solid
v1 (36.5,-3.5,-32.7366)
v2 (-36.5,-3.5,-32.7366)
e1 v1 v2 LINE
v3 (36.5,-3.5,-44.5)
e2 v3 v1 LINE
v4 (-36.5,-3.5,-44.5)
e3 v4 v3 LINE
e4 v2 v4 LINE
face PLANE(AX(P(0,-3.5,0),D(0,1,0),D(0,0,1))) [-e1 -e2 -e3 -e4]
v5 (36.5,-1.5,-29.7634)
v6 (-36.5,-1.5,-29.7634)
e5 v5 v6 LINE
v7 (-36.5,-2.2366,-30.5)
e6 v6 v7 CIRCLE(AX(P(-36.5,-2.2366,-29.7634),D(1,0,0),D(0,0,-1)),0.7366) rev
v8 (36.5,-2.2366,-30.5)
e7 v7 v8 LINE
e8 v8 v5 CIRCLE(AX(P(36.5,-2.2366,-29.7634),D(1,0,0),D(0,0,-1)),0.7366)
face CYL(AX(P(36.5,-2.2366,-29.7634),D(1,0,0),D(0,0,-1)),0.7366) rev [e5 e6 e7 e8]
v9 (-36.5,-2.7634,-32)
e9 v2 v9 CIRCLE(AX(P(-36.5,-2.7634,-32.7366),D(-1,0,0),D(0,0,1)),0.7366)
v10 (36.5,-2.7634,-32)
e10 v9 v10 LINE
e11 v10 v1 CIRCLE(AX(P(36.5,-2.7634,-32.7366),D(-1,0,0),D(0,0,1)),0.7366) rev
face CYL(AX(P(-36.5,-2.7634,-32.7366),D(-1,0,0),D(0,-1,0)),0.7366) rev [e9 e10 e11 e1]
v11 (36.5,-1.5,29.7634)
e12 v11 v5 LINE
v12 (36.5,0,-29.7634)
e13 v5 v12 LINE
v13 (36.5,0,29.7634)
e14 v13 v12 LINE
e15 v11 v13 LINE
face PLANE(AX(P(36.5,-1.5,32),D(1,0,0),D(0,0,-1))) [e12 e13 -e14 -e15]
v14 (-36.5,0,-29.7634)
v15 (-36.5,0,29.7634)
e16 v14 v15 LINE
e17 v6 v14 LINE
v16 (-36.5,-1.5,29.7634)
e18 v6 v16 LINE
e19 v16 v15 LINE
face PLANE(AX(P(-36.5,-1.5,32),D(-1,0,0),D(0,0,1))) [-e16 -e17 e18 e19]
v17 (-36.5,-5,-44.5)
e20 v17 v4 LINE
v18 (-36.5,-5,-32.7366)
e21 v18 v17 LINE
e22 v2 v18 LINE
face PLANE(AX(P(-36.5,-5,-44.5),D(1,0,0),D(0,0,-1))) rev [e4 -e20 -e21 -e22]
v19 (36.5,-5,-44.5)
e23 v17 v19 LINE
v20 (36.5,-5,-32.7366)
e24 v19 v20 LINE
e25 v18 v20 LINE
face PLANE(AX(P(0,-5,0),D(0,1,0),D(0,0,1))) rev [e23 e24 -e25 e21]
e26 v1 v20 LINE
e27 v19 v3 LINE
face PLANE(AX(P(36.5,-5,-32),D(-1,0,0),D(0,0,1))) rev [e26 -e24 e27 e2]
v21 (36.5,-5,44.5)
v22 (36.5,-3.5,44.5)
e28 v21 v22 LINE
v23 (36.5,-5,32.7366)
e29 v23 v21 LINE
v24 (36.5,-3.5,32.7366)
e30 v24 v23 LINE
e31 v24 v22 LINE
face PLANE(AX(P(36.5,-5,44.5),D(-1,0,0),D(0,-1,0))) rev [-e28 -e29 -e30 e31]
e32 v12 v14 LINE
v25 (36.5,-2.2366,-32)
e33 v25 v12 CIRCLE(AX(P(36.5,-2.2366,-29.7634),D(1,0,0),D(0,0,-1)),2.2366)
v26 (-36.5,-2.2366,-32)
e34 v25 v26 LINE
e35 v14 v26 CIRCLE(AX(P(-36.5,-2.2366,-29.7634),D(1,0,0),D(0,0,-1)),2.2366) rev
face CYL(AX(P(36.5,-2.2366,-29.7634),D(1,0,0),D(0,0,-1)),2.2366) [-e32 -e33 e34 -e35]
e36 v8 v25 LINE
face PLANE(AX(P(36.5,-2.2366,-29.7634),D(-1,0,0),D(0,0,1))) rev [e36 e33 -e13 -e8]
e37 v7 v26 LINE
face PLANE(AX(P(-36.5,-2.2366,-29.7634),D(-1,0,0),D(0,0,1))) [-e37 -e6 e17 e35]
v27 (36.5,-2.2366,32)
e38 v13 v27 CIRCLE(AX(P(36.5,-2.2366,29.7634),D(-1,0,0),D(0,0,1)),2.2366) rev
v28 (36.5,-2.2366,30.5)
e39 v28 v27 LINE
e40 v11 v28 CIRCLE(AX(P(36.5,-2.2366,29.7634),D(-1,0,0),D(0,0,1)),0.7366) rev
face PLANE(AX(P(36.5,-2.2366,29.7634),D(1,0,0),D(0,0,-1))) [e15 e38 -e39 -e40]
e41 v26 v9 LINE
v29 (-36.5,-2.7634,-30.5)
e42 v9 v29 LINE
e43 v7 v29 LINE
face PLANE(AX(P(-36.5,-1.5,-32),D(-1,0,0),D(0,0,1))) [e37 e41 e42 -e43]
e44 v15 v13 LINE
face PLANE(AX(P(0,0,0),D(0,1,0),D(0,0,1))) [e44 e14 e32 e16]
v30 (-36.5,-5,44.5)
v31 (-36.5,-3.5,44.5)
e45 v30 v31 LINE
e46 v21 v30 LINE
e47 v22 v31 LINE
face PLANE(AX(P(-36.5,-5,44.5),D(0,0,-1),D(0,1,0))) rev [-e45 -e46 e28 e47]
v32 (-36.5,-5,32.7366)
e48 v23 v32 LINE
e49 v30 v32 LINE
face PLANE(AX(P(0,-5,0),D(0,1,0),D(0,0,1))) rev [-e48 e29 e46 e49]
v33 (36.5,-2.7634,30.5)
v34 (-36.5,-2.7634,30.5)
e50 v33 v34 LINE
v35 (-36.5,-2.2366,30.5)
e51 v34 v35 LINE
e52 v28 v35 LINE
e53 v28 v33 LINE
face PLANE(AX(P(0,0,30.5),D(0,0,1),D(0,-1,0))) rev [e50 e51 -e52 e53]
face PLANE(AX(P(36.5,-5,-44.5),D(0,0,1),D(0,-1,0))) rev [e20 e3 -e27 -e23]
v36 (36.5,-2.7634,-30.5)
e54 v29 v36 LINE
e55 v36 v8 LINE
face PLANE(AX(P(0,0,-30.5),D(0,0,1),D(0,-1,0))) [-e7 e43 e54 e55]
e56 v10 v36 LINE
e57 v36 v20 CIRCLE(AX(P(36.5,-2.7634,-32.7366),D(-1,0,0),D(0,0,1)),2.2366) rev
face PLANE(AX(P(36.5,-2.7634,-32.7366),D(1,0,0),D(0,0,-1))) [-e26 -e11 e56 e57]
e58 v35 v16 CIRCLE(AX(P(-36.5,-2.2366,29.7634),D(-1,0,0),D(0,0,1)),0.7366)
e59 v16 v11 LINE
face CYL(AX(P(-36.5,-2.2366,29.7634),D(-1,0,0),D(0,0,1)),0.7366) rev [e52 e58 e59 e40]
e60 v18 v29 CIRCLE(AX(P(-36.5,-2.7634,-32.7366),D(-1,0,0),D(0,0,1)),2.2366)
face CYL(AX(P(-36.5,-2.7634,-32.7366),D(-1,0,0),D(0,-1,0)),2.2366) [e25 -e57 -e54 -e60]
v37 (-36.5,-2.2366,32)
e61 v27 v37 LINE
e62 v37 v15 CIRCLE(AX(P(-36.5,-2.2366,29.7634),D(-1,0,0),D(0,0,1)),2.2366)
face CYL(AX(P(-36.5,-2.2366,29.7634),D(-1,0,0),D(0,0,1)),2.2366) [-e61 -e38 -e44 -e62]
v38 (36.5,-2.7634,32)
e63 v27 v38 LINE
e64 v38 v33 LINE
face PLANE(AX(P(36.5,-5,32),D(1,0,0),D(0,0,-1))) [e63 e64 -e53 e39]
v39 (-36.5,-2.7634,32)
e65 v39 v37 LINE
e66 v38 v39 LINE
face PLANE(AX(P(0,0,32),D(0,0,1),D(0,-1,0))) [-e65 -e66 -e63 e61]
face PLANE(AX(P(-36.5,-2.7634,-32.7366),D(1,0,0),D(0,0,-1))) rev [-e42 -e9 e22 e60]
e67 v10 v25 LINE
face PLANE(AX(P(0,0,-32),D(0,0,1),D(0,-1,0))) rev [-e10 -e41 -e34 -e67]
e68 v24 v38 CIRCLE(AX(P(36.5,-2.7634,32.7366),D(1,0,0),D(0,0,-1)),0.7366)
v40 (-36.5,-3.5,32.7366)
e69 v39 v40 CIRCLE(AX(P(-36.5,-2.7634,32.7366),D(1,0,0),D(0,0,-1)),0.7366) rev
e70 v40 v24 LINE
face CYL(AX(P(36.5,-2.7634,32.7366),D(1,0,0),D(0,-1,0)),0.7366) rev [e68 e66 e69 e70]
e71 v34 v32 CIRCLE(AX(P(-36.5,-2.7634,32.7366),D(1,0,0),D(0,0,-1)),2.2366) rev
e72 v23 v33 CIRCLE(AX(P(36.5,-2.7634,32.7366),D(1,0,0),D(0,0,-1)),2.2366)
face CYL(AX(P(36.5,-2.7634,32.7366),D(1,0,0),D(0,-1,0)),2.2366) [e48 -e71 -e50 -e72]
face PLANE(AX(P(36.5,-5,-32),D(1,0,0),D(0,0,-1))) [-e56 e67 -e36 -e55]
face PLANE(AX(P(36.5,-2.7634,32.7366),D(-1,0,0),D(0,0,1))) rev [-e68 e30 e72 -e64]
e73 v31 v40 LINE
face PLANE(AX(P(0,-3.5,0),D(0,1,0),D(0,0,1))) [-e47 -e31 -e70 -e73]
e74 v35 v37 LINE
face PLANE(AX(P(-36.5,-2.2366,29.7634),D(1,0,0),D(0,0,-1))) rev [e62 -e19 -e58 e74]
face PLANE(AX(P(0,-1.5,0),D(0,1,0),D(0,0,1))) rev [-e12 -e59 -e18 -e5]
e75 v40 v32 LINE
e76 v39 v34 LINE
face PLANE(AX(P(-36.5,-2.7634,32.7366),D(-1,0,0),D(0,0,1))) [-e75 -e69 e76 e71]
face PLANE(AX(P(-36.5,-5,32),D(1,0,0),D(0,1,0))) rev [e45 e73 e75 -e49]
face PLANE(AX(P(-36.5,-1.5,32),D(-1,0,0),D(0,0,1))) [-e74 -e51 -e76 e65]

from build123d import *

# Parameters (mm, degrees)
SKETCH1_W                      = 73
SKETCH1_H                      = 64
BASE_FLANGE1_DEPTH             = 1.5
EDGE_FLANGE1_STRIP_W           = 7.4732
EDGE_FLANGE1_STRIP_H           = 1.5
EDGE_FLANGE1_STRIP_CUT_DEPTH   = 73
EDGE_FLANGE1_STRIP_2_W         = 7.4732
EDGE_FLANGE1_STRIP_2_H         = 1.5
EDGE_FLANGE1_STRIP_CUT_2_DEPTH = 73
EDGE_FLANGE1_DEPTH             = 73
EDGE_FLANGE1_BEND_DEPTH        = 73
EDGE_FLANGE2_STRIP_W           = 7.4732
EDGE_FLANGE2_STRIP_H           = 1.5
EDGE_FLANGE2_STRIP_CUT_DEPTH   = 73
EDGE_FLANGE2_STRIP_2_W         = 7.4732
EDGE_FLANGE2_STRIP_2_H         = 1.5
EDGE_FLANGE2_STRIP_CUT_2_DEPTH = 73
EDGE_FLANGE2_DEPTH             = 73
EDGE_FLANGE2_BEND_DEPTH        = 73


# Sheet-metal steps are written as plain solids
with BuildPart() as part:
    # Sketch1 → Base-Flange1 (new body)
    with BuildSketch(Plane(origin=(0, 0, 0), x_dir=(1, 0, 0), z_dir=(0, 1, 0))):
        Rectangle(SKETCH1_W, SKETCH1_H)
    extrude(amount=-BASE_FLANGE1_DEPTH)

    # Edge-Flange1 strip (across the edge) → Edge-Flange1 strip cut (cut)
    with BuildSketch(Plane(origin=(36.5, -1.5, 32), x_dir=(0, 0, -1), z_dir=(-1, 0, 0))):
        with Locations((-1.5, -0.75)):
            Rectangle(EDGE_FLANGE1_STRIP_W, EDGE_FLANGE1_STRIP_H)
    extrude(amount=EDGE_FLANGE1_STRIP_CUT_DEPTH, mode=Mode.SUBTRACT)

    # Edge-Flange1 strip 2 (across the edge) → Edge-Flange1 strip cut 2 (cut)
    with BuildSketch(Plane(origin=(-36.5, -1.5, -32), x_dir=(0, 0, 1), z_dir=(1, 0, 0))):
        with Locations((-1.5, -0.75)):
            Rectangle(EDGE_FLANGE1_STRIP_2_W, EDGE_FLANGE1_STRIP_2_H)
    extrude(amount=EDGE_FLANGE1_STRIP_CUT_2_DEPTH, mode=Mode.SUBTRACT)

    # Edge-Flange1 section (across the edge) → Edge-Flange1 (add)
    with BuildSketch(Plane(origin=(36.5, -1.5, 32), x_dir=(0, 0, -1), z_dir=(-1, 0, 0))):
        with BuildLine():
            Line((0, 0.7366), (0, 3.5))
            Line((0, 3.5), (1.5, 3.5))
            Line((1.5, 3.5), (1.5, 0.7366))
            ThreePointArc((1.5, 0.7366), (1.715745145, 0.215745145), (2.2366, 0))
            Line((2.2366, 0), (2.2366, -1.5))
            ThreePointArc((2.2366, -1.5), (0.655084973, -0.844915027), (0, 0.7366))
        make_face()
    extrude(amount=EDGE_FLANGE1_DEPTH)

    # Edge-Flange1 section 2 (across the edge) → Edge-Flange1 bend (add)
    with BuildSketch(Plane(origin=(-36.5, -1.5, -32), x_dir=(0, 0, 1), z_dir=(1, 0, 0))):
        with BuildLine():
            Line((0, 0.7366), (0, 3.5))
            Line((0, 3.5), (1.5, 3.5))
            Line((1.5, 3.5), (1.5, 0.7366))
            ThreePointArc((1.5, 0.7366), (1.715745145, 0.215745145), (2.2366, 0))
            Line((2.2366, 0), (2.2366, -1.5))
            ThreePointArc((2.2366, -1.5), (0.655084973, -0.844915027), (0, 0.7366))
        make_face()
    extrude(amount=EDGE_FLANGE1_BEND_DEPTH)

    # Edge-Flange2 strip (across the edge) → Edge-Flange2 strip cut (cut)
    with BuildSketch(Plane(origin=(-36.5, -5, 32), x_dir=(0, 1, 0), z_dir=(1, 0, 0))):
        with Locations((-1.5, -0.75)):
            Rectangle(EDGE_FLANGE2_STRIP_W, EDGE_FLANGE2_STRIP_H)
    extrude(amount=EDGE_FLANGE2_STRIP_CUT_DEPTH, mode=Mode.SUBTRACT)

    # Edge-Flange2 strip 2 (across the edge) → Edge-Flange2 strip cut 2 (cut)
    with BuildSketch(Plane(origin=(36.5, -5, -32), x_dir=(0, 1, 0), z_dir=(-1, 0, 0))):
        with Locations((-1.5, -0.75)):
            Rectangle(EDGE_FLANGE2_STRIP_2_W, EDGE_FLANGE2_STRIP_2_H)
    extrude(amount=EDGE_FLANGE2_STRIP_CUT_2_DEPTH, mode=Mode.SUBTRACT)

    # Edge-Flange2 section (across the edge) → Edge-Flange2 (add)
    with BuildSketch(Plane(origin=(-36.5, -5, 32), x_dir=(0, 1, 0), z_dir=(1, 0, 0))):
        with BuildLine():
            Line((0, 0.7366), (0, 12.5))
            Line((0, 12.5), (1.5, 12.5))
            Line((1.5, 12.5), (1.5, 0.7366))
            ThreePointArc((1.5, 0.7366), (1.715745145, 0.215745145), (2.2366, 0))
            Line((2.2366, 0), (2.2366, -1.5))
            ThreePointArc((2.2366, -1.5), (0.655084973, -0.844915027), (0, 0.7366))
        make_face()
    extrude(amount=EDGE_FLANGE2_DEPTH)

    # Edge-Flange2 section 2 (across the edge) → Edge-Flange2 bend (add)
    with BuildSketch(Plane(origin=(36.5, -5, -32), x_dir=(0, 1, 0), z_dir=(-1, 0, 0))):
        with BuildLine():
            Line((0, 0.7366), (0, 12.5))
            Line((0, 12.5), (1.5, 12.5))
            Line((1.5, 12.5), (1.5, 0.7366))
            ThreePointArc((1.5, 0.7366), (1.715745145, 0.215745145), (2.2366, 0))
            Line((2.2366, 0), (2.2366, -1.5))
            ThreePointArc((2.2366, -1.5), (0.655084973, -0.844915027), (0, 0.7366))
        make_face()
    extrude(amount=EDGE_FLANGE2_BEND_DEPTH)


solid = part.part
